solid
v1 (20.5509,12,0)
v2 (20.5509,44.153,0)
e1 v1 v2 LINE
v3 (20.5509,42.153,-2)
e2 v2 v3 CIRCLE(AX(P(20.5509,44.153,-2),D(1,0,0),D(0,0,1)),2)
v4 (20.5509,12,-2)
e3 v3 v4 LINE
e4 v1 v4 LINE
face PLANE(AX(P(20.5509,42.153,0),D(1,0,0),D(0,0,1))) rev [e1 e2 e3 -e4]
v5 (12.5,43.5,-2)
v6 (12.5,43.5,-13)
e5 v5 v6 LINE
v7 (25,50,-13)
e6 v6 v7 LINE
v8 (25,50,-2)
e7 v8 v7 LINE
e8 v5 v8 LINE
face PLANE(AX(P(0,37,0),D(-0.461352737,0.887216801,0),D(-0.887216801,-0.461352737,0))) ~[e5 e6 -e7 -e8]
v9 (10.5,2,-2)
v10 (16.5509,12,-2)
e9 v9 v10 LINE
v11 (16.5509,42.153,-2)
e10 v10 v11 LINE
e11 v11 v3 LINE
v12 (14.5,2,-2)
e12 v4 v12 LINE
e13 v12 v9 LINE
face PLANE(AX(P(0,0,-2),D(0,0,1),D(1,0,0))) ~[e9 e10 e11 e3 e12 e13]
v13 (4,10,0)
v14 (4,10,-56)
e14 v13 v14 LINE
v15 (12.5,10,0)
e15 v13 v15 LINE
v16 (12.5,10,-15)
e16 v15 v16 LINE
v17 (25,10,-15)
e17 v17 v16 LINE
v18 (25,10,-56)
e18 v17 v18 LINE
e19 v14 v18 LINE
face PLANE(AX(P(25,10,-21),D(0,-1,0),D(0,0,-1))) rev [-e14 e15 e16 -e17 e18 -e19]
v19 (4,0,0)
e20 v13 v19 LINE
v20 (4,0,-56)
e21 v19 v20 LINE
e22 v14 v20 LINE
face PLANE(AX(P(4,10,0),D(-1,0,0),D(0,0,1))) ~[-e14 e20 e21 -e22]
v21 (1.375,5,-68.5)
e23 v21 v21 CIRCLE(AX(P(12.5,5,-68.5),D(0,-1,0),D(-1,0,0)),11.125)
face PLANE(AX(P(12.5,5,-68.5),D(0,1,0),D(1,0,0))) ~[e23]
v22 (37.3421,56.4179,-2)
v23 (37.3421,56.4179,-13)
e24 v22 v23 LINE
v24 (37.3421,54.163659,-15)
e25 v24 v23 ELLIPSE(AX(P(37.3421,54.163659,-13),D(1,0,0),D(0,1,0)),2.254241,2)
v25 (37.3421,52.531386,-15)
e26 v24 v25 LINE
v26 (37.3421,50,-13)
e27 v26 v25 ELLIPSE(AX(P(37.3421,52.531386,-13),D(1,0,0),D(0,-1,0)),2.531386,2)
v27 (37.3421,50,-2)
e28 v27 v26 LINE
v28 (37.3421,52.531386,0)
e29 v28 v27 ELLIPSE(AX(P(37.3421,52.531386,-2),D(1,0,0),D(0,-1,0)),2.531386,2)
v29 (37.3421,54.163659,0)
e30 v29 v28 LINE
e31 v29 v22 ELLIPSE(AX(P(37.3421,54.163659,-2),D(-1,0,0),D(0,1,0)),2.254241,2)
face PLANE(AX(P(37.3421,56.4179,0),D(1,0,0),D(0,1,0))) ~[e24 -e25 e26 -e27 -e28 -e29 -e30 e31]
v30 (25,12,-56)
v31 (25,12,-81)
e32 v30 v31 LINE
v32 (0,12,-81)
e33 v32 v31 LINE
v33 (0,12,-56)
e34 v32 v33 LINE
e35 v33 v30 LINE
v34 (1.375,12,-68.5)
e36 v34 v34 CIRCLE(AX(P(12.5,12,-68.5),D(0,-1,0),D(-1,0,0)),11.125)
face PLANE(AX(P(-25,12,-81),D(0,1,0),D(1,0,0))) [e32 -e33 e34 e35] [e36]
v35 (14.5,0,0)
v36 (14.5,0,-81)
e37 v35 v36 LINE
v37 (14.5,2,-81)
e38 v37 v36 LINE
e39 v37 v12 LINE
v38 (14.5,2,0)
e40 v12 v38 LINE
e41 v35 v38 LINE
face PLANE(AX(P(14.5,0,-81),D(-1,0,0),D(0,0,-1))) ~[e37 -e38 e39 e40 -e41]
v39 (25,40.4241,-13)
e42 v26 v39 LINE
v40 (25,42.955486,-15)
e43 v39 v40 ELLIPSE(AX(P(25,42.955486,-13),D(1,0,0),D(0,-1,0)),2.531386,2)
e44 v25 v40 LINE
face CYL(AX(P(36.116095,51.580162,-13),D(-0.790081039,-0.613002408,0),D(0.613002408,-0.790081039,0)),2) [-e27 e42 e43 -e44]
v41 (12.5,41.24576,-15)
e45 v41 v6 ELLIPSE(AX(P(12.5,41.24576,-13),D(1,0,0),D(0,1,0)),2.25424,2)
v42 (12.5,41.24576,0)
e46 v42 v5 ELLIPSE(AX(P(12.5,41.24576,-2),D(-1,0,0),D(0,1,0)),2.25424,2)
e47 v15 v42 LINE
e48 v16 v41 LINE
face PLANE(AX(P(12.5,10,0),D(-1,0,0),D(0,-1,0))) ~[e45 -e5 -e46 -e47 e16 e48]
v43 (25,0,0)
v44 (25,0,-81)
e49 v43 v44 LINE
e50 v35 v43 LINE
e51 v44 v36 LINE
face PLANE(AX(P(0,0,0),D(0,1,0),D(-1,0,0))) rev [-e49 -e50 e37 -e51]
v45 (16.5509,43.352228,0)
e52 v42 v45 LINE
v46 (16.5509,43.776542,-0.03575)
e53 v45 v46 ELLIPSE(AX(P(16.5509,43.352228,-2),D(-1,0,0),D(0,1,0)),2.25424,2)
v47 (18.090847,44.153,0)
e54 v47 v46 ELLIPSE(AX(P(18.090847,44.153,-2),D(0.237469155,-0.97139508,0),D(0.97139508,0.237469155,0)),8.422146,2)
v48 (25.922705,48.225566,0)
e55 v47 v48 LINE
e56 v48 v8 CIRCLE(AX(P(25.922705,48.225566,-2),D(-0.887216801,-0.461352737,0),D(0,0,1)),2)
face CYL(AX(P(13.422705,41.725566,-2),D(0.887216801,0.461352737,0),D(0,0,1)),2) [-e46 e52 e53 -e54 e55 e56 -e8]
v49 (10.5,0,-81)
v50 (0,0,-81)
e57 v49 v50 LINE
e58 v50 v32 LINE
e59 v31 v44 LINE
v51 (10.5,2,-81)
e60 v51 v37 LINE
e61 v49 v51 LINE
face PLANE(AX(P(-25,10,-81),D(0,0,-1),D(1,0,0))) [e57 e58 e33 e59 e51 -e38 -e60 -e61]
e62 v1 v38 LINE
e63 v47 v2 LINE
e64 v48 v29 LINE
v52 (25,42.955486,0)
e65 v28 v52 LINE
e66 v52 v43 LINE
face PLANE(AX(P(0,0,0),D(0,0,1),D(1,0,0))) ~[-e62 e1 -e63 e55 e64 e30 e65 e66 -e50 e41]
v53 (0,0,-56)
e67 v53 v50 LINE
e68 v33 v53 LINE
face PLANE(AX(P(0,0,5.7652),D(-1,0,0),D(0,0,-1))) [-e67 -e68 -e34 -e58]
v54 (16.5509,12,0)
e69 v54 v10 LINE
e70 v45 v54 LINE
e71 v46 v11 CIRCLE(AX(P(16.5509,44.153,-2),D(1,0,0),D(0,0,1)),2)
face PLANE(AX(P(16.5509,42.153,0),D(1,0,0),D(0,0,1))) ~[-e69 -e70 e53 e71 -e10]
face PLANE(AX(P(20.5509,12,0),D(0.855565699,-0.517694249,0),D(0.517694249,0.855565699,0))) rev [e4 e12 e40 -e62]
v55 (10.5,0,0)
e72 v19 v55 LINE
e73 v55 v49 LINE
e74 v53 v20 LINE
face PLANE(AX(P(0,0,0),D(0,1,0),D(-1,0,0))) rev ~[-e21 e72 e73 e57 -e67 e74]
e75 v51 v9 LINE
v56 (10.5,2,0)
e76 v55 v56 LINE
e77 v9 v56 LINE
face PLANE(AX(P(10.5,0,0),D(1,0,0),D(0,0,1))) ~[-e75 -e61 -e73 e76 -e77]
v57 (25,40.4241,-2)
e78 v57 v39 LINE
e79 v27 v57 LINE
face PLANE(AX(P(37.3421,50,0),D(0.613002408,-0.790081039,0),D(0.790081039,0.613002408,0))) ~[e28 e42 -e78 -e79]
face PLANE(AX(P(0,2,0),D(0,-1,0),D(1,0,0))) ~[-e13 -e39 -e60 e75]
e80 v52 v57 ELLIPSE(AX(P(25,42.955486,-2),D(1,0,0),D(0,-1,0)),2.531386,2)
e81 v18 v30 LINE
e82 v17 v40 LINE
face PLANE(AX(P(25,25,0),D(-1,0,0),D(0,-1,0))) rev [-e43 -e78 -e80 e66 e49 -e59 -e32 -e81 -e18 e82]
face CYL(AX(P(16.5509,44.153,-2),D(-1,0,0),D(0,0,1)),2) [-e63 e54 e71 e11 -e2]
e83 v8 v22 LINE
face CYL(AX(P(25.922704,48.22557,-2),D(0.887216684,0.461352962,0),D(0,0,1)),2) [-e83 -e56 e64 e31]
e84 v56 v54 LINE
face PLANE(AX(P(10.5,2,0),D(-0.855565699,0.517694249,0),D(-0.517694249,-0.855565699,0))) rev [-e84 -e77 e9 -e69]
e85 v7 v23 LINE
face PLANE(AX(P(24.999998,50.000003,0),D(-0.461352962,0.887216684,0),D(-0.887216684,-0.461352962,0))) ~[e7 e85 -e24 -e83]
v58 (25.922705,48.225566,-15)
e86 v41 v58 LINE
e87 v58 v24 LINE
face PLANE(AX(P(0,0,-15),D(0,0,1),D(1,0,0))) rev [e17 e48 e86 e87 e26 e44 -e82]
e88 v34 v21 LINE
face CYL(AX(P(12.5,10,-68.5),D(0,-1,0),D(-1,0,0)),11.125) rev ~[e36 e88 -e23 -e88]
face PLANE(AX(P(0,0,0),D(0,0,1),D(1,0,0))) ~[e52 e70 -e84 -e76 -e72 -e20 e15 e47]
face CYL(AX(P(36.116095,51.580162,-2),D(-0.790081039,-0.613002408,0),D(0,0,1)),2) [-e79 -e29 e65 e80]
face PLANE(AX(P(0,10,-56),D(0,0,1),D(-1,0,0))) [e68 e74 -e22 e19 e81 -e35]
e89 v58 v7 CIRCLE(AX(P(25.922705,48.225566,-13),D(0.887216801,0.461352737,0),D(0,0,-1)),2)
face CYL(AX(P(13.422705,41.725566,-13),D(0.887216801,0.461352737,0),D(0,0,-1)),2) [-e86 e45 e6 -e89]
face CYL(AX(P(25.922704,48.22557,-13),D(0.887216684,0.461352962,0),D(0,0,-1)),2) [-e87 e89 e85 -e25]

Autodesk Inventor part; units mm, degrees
ref_plane "YZ Plane" through (0, 0, 0) normal (1, 0, 0) x (0, 1, 0)
ref_plane "XZ Plane" through (0, 0, 0) normal (0, 1, 0) x (-1, 0, 0)
ref_plane "XY Plane" through (0, 0, 0) normal (0, 0, 1) x (1, 0, 0)
sketch "Sketch1" plane through (0, 0, 0) normal (0, 1, 0) x (-1, 0, 0)
  line L0 (0, 0) -> (25, 0)
  line L1 (25, 0) -> (25, -81)
  line L2 (25, -81) -> (0, -81)
  line L3 (0, -81) -> (0, 0)
  dimension "d0" = 25
  dimension "d1" = 81
extrude "Extrusion1" add sketch "Sketch1" along normal blind 25
sketch "Sketch2" plane through (0, 0, 0) normal (1, 0, 0) x (0, 0, -1)
  line L0 (81, 0) -> (81, 10)
  line L1 (81, 0) -> (81, 25) projected
  line L2 (81, 25) -> (21, 25)
  line L3 (21, 25) -> (21, 10)
  line L4 (21, 10) -> (81, 10)
  line L5 (81, 10) -> (81, 25)
  point P0 (0, 0)
  dimension "d4" = 10
  dimension "d5" = 60
extrude "Extrusion2" cut sketch "Sketch2" against normal through all
sketch "Sketch3" plane through (0, 10, -21) normal (0, 1, 0) x (1, 0, 0)
  line L0 (0, 60) -> (0, -21) projected
  line L1 (-25, 60) -> (0, 60)
  line L2 (0, 60) -> (0, 35)
  line L3 (0, 35) -> (-25, 35)
  line L4 (-25, 35) -> (-25, 60)
  circle A0 centre (-12.5, 47.5) radius 11.125
  dimension "d8" = 25
  dimension "d9" = 22.25
extrude "Extrusion3" cut sketch "Sketch3" against normal blind 7 contours A0
sketch "Sketch4" plane through (-25, 0, 0) normal (0, 0, 1) x (1, 0, 0)
  line L0 (25, 10) -> (0, 25)
  line L1 (0, 25) -> (25, 25)
  line L2 (0, 25) -> (25, 25) projected
  line L3 (25, 25) -> (25, 10)
  point P0 (25, 0)
extrude "Extrusion4" cut sketch "Sketch4" against normal blind 21
sketch "Sketch5" plane through (0, 0, 0) normal (0, -1, 0) x (1, 0, 0)
  line L0 (0, 0) -> (-25, 0) projected
  line L1 (-10.5, -162) -> (-14.5, -162)
  line L2 (-14.5, -162) -> (-14.5, 0)
  line L3 (-14.5, 0) -> (-10.5, 0)
  line L4 (-10.5, 0) -> (-10.5, -162)
  line L5 (-25, -81) -> (0, -81) projected
  line L6 (-10.5, -162) -> (-14.5, 0) construction
  line L7 (-14.5, -162) -> (-10.5, 0) construction
  point P0 (-12.5, -81)
  dimension "d14" = 4
extrude "Extrusion5" cut sketch "Sketch5" against normal blind 2
sketch "Sketch6" plane through (-25, 10, -81) normal (0, 1, 0) x (1, 0, 0)
  line L0 (25, -25) -> (0, -25)
  line L1 (0, -25) -> (0, 0)
  line L2 (0, 0) -> (25, 0)
  line L3 (25, 0) -> (25, -25)
  circle A0 centre (12.5, -12.5) radius 11.125 projected
  line L4 (25, -25) -> (0, 0) construction
  line L5 (0, -25) -> (25, 0) construction
  circle A1 centre (12.5, -12.5) radius 11.125
  point P0 (25, -81)
extrude "Extrusion6" add sketch "Sketch6" along normal blind 2
sketch "Sketch7" plane through (-12.5, 3, -68.5) normal (0, 1, 0) x (1, 0, 0)
  circle A0 centre (0, 0) radius 11.125 projected
  circle A1 centre (0, 0) radius 11.125
  point P0 (12.5, -68.5)
extrude "Extrusion7" add sketch "Sketch7" along normal blind 2
sketch "Sketch8" plane through (-25, 0, 0) normal (0, 0, 1) x (1, 0, 0)
  line L0 (0, 0) -> (0, 50)
  line L1 (0, 50) -> (25, 50)
  line L2 (25, 50) -> (25, 37)
  line L3 (25, 37) -> (0, 50)
  line L4 (25, 37) -> (25, 10)
  line L5 (25, 0) -> (25, 12) projected
  line L6 (25, 10) -> (0, 25)
  line L7 (25, 10) -> (0, 25) projected
  line L8 (0, 50) -> (0, 25)
  line L9 (25, 10) -> (0, 25)
  line L10 (25, 37) -> (25, 10)
  line L11 (25, 10) -> (0, 10) projected
  line L12 (25, 37) -> (0, 50)
  dimension "d21" = 50
  dimension "d22" = 13
extrude "Extrusion8" add sketch "Sketch8" against normal blind 15 contours L0 L3 L4 L6
sketch "Sketch9" plane through (-25, 0, -81) normal (-1, 0, 0) x (0, 0, 1)
  line L0 (66, 25) -> (60, 25)
  line L1 (60, 25) -> (60, 10)
  line L2 (60, 10) -> (66, 10)
  line L3 (66, 10) -> (66, 25)
  point P0 (81, 0)
extrude "Extrusion9" cut sketch "Sketch9" against normal through all
sketch "Sketch10" plane through (-25, 0, -15) normal (0, 0, -1) x (-1, 0, 0)
  point P0 (-25, 0)
sketch "Sketch11" plane through (-10.5, 0, 0) normal (0, 0, 1) x (1, 0, 0)
  line L0 (10.5, 10) -> (-2, 10)
  line L1 (-2, 10) -> (-2, 47.9639)
  line L2 (-2, 47.9639) -> (10.5, 47.9639)
  line L3 (10.5, 47.9639) -> (10.5, 10)
  point P0 (10.5, 0)
extrude "Extrusion10" cut sketch "Sketch11" against normal blind 15
sketch "Sketch12" plane through (0, 0, 0) normal (0, 0, 1) x (1, 0, 0)
  line L0 (-12.5, 43.5) -> (-37.3421, 56.4179)
  line L1 (-25, 50) -> (-12.5, 43.5) projected
  line L2 (-37.3421, 56.4179) -> (-37.3421, 50)
  line L3 (-37.3421, 50) -> (-25, 40.4241)
  line L4 (-25, 0) -> (-25, 50) projected
  line L5 (-12.5, 43.5) -> (-25, 40.4241)
  point P0 (0, 0)
  dimension "d29" = 28
extrude "Extrusion11" add sketch "Sketch12" against normal blind 15 contours L4 L3 L2 L0
fillet "Fillet1" radius 2 1 edges at (-24.921, 49.9589, 0)
fillet "Fillet2" radius 2 1 edges at (-31.171, 45.212, 0)
fillet "Fillet3" radius 2 2 edges at (-24.921, 49.9589, -15) (-31.171, 45.212, -15)
sketch "Sketch13" plane through (0, 0, 0) normal (0, 0, 1) x (1, 0, 0)
  line L0 (-10.5, 2) -> (-16.5509, 12)
  line L1 (-23.625, 12) -> (-1.375, 12) projected
  line L2 (-16.5509, 12) -> (-16.5509, 42.153)
  line L3 (-16.5509, 42.153) -> (-20.5509, 42.153)
  line L4 (-20.5509, 42.153) -> (-20.5509, 12)
  line L5 (-20.5509, 12) -> (-14.5, 2)
  line L6 (-14.5, 2) -> (-10.5, 2)
  line L7 (-14.5, 2) -> (-10.5, 2) projected
  point P0 (0, 0)
  dimension "d35" = 4
extrude "Extrusion12" cut sketch "Sketch13" against normal blind 2
fillet "Fillet4" radius 2 1 edges at (-18.5509, 42.153, 0)
sketch "Sketch14" plane through (0, 10, 0) normal (0, 1, 0) x (1, 0, 0)
  line L0 (0, 56) -> (-25, 56) projected
  line L1 (0, 0) -> (-4, 0)
  line L2 (-4, 0) -> (-4, 56)
  line L3 (-4, 56) -> (0, 56)
  line L4 (0, 56) -> (0, 0)
  dimension "d39" = 4
extrude "Extrusion13" cut sketch "Sketch14" against normal through all
sketch "Sketch15" plane through (-25, 0, -15) normal (0, 0, -1) x (-1, 0, 0)
  point P0 (-25, 0)
mirror "Mirror1" about plane through (0, 0, 0) normal (1, 0, 0)
sketch "Sketch16" plane through (0, 0, 0) normal (0, -1, 0) x (1, 0, 0)
  line L0 (-10.5, -81) -> (10.5, -81) projected
  line L1 (0, -81) -> (-50.0267, -81)
  line L2 (-50.0267, -81) -> (-50.0267, 5.7652)
  line L3 (-50.0267, 5.7652) -> (0, 5.7652)
  line L4 (0, 5.7652) -> (0, -81)
  point P0 (0, 0)
extrude "Extrusion14" cut sketch "Sketch16" against normal through all
properties part number "ConductiveThreadSide2"
